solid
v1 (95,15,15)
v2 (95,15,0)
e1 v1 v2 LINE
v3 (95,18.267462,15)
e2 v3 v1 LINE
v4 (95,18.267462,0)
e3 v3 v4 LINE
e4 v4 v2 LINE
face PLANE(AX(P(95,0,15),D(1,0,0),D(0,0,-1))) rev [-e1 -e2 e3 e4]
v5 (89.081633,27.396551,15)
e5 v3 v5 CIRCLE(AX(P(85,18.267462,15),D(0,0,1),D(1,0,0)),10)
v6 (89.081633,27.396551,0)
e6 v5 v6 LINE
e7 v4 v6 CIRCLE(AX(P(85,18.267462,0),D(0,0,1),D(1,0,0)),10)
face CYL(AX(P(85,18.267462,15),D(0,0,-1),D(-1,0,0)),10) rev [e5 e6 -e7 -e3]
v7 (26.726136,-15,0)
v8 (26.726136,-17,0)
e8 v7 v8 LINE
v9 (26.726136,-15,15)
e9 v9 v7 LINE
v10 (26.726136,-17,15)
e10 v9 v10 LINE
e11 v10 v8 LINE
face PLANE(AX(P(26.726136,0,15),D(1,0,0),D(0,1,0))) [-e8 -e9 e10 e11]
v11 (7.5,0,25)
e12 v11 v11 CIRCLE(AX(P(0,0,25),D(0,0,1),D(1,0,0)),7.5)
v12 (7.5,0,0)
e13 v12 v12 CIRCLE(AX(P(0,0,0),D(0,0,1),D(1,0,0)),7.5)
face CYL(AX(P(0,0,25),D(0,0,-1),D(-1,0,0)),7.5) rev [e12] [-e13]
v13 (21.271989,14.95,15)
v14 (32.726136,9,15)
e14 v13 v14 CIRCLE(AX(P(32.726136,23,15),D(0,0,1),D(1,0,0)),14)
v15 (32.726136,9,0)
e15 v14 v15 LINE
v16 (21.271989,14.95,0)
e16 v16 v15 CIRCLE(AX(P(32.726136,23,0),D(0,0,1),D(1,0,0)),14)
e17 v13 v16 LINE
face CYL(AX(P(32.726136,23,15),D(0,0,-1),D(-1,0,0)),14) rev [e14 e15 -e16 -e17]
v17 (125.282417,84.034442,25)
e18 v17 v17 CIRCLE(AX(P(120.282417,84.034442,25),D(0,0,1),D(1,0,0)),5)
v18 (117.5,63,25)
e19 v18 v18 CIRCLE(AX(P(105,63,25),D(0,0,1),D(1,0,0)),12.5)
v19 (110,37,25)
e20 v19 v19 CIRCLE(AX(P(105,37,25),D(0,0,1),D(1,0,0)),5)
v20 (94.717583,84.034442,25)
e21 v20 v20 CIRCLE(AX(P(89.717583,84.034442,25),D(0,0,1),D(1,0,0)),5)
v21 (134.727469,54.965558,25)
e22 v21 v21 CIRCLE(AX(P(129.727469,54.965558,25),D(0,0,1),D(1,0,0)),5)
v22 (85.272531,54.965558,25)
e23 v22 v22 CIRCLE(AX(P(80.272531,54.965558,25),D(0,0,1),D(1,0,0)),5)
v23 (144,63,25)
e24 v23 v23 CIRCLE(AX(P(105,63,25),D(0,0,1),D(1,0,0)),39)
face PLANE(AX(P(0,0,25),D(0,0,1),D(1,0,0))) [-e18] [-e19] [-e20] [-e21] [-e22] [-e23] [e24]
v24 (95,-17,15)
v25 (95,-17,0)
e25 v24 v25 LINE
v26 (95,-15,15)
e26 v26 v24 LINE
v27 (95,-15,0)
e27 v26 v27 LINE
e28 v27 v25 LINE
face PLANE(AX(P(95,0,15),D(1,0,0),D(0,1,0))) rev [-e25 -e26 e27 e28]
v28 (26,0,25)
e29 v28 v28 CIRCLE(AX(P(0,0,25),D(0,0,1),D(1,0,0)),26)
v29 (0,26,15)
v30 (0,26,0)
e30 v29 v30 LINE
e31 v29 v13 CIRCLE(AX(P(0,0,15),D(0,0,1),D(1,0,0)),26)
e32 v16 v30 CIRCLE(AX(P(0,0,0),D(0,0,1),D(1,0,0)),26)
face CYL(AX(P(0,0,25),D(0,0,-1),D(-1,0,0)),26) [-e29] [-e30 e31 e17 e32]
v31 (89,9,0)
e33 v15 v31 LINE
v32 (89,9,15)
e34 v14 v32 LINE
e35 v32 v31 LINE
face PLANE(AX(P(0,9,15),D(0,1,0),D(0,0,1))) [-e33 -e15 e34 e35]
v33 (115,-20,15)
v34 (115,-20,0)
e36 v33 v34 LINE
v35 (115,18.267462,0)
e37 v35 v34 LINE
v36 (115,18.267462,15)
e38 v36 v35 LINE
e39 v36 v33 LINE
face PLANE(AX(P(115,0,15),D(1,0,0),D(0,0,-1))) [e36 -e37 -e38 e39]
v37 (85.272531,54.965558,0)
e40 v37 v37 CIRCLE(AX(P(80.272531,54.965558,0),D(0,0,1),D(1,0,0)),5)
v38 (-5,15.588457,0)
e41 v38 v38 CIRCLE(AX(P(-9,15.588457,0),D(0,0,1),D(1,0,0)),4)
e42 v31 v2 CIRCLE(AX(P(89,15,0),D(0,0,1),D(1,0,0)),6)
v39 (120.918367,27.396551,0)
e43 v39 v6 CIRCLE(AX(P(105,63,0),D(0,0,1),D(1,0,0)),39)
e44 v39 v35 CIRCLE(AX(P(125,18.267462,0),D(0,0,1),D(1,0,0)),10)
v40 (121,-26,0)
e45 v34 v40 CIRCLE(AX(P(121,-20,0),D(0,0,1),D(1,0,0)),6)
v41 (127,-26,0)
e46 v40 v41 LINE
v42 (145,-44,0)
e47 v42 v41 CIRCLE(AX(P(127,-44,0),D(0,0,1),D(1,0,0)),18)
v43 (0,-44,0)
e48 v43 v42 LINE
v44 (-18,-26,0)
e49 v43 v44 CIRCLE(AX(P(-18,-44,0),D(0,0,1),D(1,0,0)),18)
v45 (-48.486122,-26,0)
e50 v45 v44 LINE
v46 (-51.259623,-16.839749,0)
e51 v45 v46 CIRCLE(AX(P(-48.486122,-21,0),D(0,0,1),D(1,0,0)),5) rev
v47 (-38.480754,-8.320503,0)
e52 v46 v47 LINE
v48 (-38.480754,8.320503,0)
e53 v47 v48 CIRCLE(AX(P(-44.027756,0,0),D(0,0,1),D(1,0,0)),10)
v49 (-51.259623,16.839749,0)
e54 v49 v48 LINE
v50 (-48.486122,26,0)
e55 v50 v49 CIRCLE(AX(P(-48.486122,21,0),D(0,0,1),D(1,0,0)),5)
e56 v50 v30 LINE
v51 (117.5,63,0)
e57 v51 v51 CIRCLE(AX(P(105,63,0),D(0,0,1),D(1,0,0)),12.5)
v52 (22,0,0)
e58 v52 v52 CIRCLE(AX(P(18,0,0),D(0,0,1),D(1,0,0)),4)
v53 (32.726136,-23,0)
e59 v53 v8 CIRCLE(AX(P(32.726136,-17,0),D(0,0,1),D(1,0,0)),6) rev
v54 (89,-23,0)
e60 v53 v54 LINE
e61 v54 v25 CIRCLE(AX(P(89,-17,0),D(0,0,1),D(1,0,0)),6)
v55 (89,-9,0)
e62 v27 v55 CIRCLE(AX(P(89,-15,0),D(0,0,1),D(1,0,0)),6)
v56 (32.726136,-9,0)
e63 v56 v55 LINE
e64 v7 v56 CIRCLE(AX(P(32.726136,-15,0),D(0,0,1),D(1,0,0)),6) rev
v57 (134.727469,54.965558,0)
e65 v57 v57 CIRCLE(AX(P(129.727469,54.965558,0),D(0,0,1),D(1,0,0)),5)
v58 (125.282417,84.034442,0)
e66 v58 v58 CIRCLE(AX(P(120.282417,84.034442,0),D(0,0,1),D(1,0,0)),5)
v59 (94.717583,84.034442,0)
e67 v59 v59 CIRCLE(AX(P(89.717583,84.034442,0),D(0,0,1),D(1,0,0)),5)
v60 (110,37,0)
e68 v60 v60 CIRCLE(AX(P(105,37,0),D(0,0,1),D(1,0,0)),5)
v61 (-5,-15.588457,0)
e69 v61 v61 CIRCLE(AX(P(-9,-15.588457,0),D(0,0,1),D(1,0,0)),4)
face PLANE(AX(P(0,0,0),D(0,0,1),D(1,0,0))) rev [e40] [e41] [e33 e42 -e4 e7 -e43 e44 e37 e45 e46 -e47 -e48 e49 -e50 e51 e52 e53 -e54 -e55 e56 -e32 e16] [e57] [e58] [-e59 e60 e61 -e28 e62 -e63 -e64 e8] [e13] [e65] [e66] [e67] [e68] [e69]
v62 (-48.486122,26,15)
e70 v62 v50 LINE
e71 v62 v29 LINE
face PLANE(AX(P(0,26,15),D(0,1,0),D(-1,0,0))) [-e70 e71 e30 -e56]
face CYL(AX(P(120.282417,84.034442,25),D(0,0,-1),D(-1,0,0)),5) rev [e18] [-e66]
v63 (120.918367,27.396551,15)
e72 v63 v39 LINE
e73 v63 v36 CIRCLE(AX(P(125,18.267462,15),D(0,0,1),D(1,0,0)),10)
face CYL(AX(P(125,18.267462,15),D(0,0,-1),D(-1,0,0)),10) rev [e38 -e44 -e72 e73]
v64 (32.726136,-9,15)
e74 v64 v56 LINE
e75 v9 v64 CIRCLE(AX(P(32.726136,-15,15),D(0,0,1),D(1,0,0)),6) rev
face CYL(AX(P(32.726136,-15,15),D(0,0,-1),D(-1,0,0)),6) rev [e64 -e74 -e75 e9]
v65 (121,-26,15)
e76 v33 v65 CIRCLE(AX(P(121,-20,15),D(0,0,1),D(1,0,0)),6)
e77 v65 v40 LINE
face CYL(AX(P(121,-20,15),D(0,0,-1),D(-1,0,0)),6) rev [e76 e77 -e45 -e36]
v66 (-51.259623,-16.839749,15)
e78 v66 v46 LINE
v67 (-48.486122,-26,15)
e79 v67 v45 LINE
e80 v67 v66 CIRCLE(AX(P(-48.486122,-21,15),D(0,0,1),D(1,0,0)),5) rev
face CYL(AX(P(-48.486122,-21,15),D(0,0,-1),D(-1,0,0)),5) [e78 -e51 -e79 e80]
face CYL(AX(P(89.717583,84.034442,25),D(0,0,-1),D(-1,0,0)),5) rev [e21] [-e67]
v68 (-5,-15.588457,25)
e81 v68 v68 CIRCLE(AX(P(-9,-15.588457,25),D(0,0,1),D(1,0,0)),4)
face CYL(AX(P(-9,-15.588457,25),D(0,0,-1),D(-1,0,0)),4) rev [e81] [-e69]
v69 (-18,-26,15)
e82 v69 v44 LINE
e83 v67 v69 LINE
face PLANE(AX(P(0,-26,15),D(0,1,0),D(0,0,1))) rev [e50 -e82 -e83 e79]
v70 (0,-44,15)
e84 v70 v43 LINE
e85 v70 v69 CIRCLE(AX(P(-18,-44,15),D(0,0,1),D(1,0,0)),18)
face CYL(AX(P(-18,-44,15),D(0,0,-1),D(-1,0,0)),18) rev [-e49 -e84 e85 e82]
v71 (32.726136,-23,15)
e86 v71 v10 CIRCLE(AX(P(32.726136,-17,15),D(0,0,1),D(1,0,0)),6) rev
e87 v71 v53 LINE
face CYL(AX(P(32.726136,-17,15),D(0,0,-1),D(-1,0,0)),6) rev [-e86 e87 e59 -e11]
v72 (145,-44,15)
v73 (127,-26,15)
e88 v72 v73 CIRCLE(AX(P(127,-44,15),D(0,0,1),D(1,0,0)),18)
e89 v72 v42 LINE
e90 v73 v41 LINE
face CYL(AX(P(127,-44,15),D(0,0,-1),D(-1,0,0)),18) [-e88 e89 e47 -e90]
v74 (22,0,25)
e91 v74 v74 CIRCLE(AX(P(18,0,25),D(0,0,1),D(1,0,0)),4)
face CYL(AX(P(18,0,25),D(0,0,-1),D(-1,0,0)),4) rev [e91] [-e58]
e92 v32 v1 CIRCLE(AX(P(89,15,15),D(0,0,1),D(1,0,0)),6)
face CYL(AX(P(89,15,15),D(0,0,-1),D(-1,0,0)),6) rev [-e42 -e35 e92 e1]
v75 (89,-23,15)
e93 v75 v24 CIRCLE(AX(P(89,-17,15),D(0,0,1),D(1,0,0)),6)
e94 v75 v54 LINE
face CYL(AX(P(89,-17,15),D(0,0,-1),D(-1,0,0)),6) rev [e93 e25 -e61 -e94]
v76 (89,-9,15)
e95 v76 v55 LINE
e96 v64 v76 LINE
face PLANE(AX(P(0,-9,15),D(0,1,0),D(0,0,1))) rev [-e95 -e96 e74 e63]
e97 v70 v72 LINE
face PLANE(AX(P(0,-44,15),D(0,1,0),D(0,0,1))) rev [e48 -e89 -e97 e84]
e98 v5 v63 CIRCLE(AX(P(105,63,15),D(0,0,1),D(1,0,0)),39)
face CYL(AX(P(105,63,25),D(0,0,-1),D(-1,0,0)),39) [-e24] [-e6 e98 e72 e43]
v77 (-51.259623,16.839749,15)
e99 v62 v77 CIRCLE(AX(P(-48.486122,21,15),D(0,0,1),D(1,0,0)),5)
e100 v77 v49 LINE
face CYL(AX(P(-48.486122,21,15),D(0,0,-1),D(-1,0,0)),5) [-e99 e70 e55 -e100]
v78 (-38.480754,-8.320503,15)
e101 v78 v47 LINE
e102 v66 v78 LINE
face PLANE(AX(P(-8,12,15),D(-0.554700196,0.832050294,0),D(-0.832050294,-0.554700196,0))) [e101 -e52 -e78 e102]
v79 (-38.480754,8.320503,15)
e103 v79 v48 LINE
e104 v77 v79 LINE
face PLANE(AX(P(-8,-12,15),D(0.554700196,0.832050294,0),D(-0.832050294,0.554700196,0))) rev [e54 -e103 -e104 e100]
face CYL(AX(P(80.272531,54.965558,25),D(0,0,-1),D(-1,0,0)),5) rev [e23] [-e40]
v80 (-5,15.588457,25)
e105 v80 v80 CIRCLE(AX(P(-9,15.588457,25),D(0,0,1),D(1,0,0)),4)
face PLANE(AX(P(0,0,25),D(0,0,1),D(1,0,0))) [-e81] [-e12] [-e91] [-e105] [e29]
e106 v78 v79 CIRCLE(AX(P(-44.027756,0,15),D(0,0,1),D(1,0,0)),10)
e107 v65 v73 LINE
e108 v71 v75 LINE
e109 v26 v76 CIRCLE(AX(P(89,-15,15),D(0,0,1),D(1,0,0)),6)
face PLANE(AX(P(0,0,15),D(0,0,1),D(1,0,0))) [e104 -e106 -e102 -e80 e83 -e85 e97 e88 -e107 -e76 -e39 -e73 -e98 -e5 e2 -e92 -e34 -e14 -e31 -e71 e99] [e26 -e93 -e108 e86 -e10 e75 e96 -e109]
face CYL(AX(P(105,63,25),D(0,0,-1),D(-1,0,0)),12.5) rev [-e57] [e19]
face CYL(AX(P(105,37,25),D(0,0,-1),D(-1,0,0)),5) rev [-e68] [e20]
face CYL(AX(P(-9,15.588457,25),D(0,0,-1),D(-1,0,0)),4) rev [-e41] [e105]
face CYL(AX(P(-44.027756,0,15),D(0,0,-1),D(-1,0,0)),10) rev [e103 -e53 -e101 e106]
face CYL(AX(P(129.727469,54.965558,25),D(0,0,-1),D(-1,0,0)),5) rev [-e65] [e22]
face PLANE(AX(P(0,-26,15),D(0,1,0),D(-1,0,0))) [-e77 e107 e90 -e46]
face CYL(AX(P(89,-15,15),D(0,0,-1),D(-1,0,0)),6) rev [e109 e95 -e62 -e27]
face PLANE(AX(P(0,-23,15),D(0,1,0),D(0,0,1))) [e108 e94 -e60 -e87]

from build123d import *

# Parameters (mm, degrees)
EXTRUDE_1_DEPTH = 15
SKETCH_1_3_R    = 26
SKETCH_1_3_R_2  = 4
SKETCH_1_3_R_3  = 7.5
SKETCH_1_3_R_4  = 39
SKETCH_1_3_R_5  = 5
SKETCH_1_3_R_6  = 12.5
EXTRUDE_4_DEPTH = 25
EXTRUDE_5_DEPTH = 10


with BuildPart() as part:
    # Эскиз1 → Бобышка-Вытянуть1 (new body)
    with BuildSketch(Plane.XY):
        with BuildLine():
            Line((0, 26), (-48.486121811, 26))
            ThreePointArc((-48.486121811, 26), (-53.271581944, 22.448920743), (-51.259622792, 16.839748528))
            Line((-51.259622792, 16.839748528), (-38.480754415, 8.320502943))
            ThreePointArc((-38.480754415, 8.320502943), (-34.027756377, 0), (-38.480754415, -8.320502943))
            Line((-38.480754415, -8.320502943), (-51.259622792, -16.839748528))
            ThreePointArc((-51.259622792, -16.839748528), (-53.271581944, -22.448920743), (-48.486121811, -26))
            Line((-48.486121811, -26), (-18, -26))
            ThreePointArc((-18, -26), (-5.272077939, -31.272077939), (0, -44))
            Line((0, -44), (145, -44))
            ThreePointArc((145, -44), (139.727922061, -31.272077939), (127, -26))
            Line((127, -26), (121, -26))
            ThreePointArc((121, -26), (116.757359313, -24.242640687), (115, -20))
            Line((115, -20), (115, 18.267461507))
            ThreePointArc((115, 18.267461507), (116.609042768, 23.70729944), (120.918367347, 27.396550996))
            ThreePointArc((120.918367347, 27.396550996), (105, 24), (89.081632653, 27.396550996))
            ThreePointArc((89.081632653, 27.396550996), (93.390957232, 23.70729944), (95, 18.267461507))
            Line((95, 18.267461507), (95, 15))
            ThreePointArc((95, 15), (93.242640687, 10.757359313), (89, 9))
            Line((89, 9), (32.726136344, 9))
            ThreePointArc((32.726136344, 9), (26.272455224, 10.576232455), (21.271988624, 14.95))
            ThreePointArc((21.271988624, 14.95), (24.789833644, 7.839907391), (26, 0))
            ThreePointArc((26, 0), (-18.384776311, -18.384776311), (0, 26))
        make_face()
        with BuildLine():
            Line((89, -23), (32.726136344, -23))
            ThreePointArc((32.726136344, -23), (28.483495657, -21.242640687), (26.726136344, -17))
            Line((26.726136344, -17), (26.726136344, -15))
            ThreePointArc((26.726136344, -15), (28.483495657, -10.757359313), (32.726136344, -9))
            Line((32.726136344, -9), (89, -9))
            ThreePointArc((89, -9), (93.242640687, -10.757359313), (95, -15))
            Line((95, -15), (95, -17))
            ThreePointArc((95, -17), (93.242640687, -21.242640687), (89, -23))
        make_face(mode=Mode.SUBTRACT)
    extrude(amount=EXTRUDE_1_DEPTH)

    # Эскиз1<3> → Бобышка-Вытянуть4 (add)
    # profile 1 of 2: a face of its own
    with BuildSketch(Plane.XY):
        Circle(SKETCH_1_3_R)
        with Locations((-9, -15.588457268)):
            Circle(SKETCH_1_3_R_2, mode=Mode.SUBTRACT)
        with Locations((-9, 15.588457268)):
            Circle(SKETCH_1_3_R_2, mode=Mode.SUBTRACT)
        Circle(SKETCH_1_3_R_3, mode=Mode.SUBTRACT)
        with Locations((18, 0)):
            Circle(SKETCH_1_3_R_2, mode=Mode.SUBTRACT)
    # profile 2 of 2: a face of its own
    with BuildSketch(Plane.XY):
        with Locations((105, 63)):
            Circle(SKETCH_1_3_R_4)
        with Locations((80.272530576, 54.965558146)):
            Circle(SKETCH_1_3_R_5, mode=Mode.SUBTRACT)
        with Locations((105, 37)):
            Circle(SKETCH_1_3_R_5, mode=Mode.SUBTRACT)
        with Locations((105, 63)):
            Circle(SKETCH_1_3_R_6, mode=Mode.SUBTRACT)
        with Locations((129.727469424, 54.965558146)):
            Circle(SKETCH_1_3_R_5, mode=Mode.SUBTRACT)
        with Locations((89.71758344, 84.034441854)):
            Circle(SKETCH_1_3_R_5, mode=Mode.SUBTRACT)
        with Locations((120.28241656, 84.034441854)):
            Circle(SKETCH_1_3_R_5, mode=Mode.SUBTRACT)
    extrude(amount=EXTRUDE_4_DEPTH)

    # Эскиз1<4> → Бобышка-Вытянуть5 (add)
    with BuildSketch(Plane.XY):
        with BuildLine():
            Line((0, 26), (-48.486121811, 26))
            ThreePointArc((-48.486121811, 26), (-53.271581944, 22.448920743), (-51.259622792, 16.839748528))
            Line((-51.259622792, 16.839748528), (-38.480754415, 8.320502943))
            ThreePointArc((-38.480754415, 8.320502943), (-34.027756377, 0), (-38.480754415, -8.320502943))
            Line((-38.480754415, -8.320502943), (-51.259622792, -16.839748528))
            ThreePointArc((-51.259622792, -16.839748528), (-53.271581944, -22.448920743), (-48.486121811, -26))
            Line((-48.486121811, -26), (-18, -26))
            ThreePointArc((-18, -26), (-5.272077939, -31.272077939), (0, -44))
            Line((0, -44), (145, -44))
            ThreePointArc((145, -44), (139.727922061, -31.272077939), (127, -26))
            Line((127, -26), (121, -26))
            ThreePointArc((121, -26), (116.757359313, -24.242640687), (115, -20))
            Line((115, -20), (115, 18.267461507))
            ThreePointArc((115, 18.267461507), (116.609042768, 23.70729944), (120.918367347, 27.396550996))
            ThreePointArc((120.918367347, 27.396550996), (105, 24), (89.081632653, 27.396550996))
            ThreePointArc((89.081632653, 27.396550996), (93.390957232, 23.70729944), (95, 18.267461507))
            Line((95, 18.267461507), (95, 15))
            ThreePointArc((95, 15), (93.242640687, 10.757359313), (89, 9))
            Line((89, 9), (32.726136344, 9))
            ThreePointArc((32.726136344, 9), (26.272455224, 10.576232455), (21.271988624, 14.95))
            ThreePointArc((21.271988624, 14.95), (24.789833644, 7.839907391), (26, 0))
            ThreePointArc((26, 0), (-18.384776311, -18.384776311), (0, 26))
        make_face()
        with BuildLine():
            Line((89, -23), (32.726136344, -23))
            ThreePointArc((32.726136344, -23), (28.483495657, -21.242640687), (26.726136344, -17))
            Line((26.726136344, -17), (26.726136344, -15))
            ThreePointArc((26.726136344, -15), (28.483495657, -10.757359313), (32.726136344, -9))
            Line((32.726136344, -9), (89, -9))
            ThreePointArc((89, -9), (93.242640687, -10.757359313), (95, -15))
            Line((95, -15), (95, -17))
            ThreePointArc((95, -17), (93.242640687, -21.242640687), (89, -23))
        make_face(mode=Mode.SUBTRACT)
    extrude(amount=EXTRUDE_5_DEPTH)


solid = part.part
